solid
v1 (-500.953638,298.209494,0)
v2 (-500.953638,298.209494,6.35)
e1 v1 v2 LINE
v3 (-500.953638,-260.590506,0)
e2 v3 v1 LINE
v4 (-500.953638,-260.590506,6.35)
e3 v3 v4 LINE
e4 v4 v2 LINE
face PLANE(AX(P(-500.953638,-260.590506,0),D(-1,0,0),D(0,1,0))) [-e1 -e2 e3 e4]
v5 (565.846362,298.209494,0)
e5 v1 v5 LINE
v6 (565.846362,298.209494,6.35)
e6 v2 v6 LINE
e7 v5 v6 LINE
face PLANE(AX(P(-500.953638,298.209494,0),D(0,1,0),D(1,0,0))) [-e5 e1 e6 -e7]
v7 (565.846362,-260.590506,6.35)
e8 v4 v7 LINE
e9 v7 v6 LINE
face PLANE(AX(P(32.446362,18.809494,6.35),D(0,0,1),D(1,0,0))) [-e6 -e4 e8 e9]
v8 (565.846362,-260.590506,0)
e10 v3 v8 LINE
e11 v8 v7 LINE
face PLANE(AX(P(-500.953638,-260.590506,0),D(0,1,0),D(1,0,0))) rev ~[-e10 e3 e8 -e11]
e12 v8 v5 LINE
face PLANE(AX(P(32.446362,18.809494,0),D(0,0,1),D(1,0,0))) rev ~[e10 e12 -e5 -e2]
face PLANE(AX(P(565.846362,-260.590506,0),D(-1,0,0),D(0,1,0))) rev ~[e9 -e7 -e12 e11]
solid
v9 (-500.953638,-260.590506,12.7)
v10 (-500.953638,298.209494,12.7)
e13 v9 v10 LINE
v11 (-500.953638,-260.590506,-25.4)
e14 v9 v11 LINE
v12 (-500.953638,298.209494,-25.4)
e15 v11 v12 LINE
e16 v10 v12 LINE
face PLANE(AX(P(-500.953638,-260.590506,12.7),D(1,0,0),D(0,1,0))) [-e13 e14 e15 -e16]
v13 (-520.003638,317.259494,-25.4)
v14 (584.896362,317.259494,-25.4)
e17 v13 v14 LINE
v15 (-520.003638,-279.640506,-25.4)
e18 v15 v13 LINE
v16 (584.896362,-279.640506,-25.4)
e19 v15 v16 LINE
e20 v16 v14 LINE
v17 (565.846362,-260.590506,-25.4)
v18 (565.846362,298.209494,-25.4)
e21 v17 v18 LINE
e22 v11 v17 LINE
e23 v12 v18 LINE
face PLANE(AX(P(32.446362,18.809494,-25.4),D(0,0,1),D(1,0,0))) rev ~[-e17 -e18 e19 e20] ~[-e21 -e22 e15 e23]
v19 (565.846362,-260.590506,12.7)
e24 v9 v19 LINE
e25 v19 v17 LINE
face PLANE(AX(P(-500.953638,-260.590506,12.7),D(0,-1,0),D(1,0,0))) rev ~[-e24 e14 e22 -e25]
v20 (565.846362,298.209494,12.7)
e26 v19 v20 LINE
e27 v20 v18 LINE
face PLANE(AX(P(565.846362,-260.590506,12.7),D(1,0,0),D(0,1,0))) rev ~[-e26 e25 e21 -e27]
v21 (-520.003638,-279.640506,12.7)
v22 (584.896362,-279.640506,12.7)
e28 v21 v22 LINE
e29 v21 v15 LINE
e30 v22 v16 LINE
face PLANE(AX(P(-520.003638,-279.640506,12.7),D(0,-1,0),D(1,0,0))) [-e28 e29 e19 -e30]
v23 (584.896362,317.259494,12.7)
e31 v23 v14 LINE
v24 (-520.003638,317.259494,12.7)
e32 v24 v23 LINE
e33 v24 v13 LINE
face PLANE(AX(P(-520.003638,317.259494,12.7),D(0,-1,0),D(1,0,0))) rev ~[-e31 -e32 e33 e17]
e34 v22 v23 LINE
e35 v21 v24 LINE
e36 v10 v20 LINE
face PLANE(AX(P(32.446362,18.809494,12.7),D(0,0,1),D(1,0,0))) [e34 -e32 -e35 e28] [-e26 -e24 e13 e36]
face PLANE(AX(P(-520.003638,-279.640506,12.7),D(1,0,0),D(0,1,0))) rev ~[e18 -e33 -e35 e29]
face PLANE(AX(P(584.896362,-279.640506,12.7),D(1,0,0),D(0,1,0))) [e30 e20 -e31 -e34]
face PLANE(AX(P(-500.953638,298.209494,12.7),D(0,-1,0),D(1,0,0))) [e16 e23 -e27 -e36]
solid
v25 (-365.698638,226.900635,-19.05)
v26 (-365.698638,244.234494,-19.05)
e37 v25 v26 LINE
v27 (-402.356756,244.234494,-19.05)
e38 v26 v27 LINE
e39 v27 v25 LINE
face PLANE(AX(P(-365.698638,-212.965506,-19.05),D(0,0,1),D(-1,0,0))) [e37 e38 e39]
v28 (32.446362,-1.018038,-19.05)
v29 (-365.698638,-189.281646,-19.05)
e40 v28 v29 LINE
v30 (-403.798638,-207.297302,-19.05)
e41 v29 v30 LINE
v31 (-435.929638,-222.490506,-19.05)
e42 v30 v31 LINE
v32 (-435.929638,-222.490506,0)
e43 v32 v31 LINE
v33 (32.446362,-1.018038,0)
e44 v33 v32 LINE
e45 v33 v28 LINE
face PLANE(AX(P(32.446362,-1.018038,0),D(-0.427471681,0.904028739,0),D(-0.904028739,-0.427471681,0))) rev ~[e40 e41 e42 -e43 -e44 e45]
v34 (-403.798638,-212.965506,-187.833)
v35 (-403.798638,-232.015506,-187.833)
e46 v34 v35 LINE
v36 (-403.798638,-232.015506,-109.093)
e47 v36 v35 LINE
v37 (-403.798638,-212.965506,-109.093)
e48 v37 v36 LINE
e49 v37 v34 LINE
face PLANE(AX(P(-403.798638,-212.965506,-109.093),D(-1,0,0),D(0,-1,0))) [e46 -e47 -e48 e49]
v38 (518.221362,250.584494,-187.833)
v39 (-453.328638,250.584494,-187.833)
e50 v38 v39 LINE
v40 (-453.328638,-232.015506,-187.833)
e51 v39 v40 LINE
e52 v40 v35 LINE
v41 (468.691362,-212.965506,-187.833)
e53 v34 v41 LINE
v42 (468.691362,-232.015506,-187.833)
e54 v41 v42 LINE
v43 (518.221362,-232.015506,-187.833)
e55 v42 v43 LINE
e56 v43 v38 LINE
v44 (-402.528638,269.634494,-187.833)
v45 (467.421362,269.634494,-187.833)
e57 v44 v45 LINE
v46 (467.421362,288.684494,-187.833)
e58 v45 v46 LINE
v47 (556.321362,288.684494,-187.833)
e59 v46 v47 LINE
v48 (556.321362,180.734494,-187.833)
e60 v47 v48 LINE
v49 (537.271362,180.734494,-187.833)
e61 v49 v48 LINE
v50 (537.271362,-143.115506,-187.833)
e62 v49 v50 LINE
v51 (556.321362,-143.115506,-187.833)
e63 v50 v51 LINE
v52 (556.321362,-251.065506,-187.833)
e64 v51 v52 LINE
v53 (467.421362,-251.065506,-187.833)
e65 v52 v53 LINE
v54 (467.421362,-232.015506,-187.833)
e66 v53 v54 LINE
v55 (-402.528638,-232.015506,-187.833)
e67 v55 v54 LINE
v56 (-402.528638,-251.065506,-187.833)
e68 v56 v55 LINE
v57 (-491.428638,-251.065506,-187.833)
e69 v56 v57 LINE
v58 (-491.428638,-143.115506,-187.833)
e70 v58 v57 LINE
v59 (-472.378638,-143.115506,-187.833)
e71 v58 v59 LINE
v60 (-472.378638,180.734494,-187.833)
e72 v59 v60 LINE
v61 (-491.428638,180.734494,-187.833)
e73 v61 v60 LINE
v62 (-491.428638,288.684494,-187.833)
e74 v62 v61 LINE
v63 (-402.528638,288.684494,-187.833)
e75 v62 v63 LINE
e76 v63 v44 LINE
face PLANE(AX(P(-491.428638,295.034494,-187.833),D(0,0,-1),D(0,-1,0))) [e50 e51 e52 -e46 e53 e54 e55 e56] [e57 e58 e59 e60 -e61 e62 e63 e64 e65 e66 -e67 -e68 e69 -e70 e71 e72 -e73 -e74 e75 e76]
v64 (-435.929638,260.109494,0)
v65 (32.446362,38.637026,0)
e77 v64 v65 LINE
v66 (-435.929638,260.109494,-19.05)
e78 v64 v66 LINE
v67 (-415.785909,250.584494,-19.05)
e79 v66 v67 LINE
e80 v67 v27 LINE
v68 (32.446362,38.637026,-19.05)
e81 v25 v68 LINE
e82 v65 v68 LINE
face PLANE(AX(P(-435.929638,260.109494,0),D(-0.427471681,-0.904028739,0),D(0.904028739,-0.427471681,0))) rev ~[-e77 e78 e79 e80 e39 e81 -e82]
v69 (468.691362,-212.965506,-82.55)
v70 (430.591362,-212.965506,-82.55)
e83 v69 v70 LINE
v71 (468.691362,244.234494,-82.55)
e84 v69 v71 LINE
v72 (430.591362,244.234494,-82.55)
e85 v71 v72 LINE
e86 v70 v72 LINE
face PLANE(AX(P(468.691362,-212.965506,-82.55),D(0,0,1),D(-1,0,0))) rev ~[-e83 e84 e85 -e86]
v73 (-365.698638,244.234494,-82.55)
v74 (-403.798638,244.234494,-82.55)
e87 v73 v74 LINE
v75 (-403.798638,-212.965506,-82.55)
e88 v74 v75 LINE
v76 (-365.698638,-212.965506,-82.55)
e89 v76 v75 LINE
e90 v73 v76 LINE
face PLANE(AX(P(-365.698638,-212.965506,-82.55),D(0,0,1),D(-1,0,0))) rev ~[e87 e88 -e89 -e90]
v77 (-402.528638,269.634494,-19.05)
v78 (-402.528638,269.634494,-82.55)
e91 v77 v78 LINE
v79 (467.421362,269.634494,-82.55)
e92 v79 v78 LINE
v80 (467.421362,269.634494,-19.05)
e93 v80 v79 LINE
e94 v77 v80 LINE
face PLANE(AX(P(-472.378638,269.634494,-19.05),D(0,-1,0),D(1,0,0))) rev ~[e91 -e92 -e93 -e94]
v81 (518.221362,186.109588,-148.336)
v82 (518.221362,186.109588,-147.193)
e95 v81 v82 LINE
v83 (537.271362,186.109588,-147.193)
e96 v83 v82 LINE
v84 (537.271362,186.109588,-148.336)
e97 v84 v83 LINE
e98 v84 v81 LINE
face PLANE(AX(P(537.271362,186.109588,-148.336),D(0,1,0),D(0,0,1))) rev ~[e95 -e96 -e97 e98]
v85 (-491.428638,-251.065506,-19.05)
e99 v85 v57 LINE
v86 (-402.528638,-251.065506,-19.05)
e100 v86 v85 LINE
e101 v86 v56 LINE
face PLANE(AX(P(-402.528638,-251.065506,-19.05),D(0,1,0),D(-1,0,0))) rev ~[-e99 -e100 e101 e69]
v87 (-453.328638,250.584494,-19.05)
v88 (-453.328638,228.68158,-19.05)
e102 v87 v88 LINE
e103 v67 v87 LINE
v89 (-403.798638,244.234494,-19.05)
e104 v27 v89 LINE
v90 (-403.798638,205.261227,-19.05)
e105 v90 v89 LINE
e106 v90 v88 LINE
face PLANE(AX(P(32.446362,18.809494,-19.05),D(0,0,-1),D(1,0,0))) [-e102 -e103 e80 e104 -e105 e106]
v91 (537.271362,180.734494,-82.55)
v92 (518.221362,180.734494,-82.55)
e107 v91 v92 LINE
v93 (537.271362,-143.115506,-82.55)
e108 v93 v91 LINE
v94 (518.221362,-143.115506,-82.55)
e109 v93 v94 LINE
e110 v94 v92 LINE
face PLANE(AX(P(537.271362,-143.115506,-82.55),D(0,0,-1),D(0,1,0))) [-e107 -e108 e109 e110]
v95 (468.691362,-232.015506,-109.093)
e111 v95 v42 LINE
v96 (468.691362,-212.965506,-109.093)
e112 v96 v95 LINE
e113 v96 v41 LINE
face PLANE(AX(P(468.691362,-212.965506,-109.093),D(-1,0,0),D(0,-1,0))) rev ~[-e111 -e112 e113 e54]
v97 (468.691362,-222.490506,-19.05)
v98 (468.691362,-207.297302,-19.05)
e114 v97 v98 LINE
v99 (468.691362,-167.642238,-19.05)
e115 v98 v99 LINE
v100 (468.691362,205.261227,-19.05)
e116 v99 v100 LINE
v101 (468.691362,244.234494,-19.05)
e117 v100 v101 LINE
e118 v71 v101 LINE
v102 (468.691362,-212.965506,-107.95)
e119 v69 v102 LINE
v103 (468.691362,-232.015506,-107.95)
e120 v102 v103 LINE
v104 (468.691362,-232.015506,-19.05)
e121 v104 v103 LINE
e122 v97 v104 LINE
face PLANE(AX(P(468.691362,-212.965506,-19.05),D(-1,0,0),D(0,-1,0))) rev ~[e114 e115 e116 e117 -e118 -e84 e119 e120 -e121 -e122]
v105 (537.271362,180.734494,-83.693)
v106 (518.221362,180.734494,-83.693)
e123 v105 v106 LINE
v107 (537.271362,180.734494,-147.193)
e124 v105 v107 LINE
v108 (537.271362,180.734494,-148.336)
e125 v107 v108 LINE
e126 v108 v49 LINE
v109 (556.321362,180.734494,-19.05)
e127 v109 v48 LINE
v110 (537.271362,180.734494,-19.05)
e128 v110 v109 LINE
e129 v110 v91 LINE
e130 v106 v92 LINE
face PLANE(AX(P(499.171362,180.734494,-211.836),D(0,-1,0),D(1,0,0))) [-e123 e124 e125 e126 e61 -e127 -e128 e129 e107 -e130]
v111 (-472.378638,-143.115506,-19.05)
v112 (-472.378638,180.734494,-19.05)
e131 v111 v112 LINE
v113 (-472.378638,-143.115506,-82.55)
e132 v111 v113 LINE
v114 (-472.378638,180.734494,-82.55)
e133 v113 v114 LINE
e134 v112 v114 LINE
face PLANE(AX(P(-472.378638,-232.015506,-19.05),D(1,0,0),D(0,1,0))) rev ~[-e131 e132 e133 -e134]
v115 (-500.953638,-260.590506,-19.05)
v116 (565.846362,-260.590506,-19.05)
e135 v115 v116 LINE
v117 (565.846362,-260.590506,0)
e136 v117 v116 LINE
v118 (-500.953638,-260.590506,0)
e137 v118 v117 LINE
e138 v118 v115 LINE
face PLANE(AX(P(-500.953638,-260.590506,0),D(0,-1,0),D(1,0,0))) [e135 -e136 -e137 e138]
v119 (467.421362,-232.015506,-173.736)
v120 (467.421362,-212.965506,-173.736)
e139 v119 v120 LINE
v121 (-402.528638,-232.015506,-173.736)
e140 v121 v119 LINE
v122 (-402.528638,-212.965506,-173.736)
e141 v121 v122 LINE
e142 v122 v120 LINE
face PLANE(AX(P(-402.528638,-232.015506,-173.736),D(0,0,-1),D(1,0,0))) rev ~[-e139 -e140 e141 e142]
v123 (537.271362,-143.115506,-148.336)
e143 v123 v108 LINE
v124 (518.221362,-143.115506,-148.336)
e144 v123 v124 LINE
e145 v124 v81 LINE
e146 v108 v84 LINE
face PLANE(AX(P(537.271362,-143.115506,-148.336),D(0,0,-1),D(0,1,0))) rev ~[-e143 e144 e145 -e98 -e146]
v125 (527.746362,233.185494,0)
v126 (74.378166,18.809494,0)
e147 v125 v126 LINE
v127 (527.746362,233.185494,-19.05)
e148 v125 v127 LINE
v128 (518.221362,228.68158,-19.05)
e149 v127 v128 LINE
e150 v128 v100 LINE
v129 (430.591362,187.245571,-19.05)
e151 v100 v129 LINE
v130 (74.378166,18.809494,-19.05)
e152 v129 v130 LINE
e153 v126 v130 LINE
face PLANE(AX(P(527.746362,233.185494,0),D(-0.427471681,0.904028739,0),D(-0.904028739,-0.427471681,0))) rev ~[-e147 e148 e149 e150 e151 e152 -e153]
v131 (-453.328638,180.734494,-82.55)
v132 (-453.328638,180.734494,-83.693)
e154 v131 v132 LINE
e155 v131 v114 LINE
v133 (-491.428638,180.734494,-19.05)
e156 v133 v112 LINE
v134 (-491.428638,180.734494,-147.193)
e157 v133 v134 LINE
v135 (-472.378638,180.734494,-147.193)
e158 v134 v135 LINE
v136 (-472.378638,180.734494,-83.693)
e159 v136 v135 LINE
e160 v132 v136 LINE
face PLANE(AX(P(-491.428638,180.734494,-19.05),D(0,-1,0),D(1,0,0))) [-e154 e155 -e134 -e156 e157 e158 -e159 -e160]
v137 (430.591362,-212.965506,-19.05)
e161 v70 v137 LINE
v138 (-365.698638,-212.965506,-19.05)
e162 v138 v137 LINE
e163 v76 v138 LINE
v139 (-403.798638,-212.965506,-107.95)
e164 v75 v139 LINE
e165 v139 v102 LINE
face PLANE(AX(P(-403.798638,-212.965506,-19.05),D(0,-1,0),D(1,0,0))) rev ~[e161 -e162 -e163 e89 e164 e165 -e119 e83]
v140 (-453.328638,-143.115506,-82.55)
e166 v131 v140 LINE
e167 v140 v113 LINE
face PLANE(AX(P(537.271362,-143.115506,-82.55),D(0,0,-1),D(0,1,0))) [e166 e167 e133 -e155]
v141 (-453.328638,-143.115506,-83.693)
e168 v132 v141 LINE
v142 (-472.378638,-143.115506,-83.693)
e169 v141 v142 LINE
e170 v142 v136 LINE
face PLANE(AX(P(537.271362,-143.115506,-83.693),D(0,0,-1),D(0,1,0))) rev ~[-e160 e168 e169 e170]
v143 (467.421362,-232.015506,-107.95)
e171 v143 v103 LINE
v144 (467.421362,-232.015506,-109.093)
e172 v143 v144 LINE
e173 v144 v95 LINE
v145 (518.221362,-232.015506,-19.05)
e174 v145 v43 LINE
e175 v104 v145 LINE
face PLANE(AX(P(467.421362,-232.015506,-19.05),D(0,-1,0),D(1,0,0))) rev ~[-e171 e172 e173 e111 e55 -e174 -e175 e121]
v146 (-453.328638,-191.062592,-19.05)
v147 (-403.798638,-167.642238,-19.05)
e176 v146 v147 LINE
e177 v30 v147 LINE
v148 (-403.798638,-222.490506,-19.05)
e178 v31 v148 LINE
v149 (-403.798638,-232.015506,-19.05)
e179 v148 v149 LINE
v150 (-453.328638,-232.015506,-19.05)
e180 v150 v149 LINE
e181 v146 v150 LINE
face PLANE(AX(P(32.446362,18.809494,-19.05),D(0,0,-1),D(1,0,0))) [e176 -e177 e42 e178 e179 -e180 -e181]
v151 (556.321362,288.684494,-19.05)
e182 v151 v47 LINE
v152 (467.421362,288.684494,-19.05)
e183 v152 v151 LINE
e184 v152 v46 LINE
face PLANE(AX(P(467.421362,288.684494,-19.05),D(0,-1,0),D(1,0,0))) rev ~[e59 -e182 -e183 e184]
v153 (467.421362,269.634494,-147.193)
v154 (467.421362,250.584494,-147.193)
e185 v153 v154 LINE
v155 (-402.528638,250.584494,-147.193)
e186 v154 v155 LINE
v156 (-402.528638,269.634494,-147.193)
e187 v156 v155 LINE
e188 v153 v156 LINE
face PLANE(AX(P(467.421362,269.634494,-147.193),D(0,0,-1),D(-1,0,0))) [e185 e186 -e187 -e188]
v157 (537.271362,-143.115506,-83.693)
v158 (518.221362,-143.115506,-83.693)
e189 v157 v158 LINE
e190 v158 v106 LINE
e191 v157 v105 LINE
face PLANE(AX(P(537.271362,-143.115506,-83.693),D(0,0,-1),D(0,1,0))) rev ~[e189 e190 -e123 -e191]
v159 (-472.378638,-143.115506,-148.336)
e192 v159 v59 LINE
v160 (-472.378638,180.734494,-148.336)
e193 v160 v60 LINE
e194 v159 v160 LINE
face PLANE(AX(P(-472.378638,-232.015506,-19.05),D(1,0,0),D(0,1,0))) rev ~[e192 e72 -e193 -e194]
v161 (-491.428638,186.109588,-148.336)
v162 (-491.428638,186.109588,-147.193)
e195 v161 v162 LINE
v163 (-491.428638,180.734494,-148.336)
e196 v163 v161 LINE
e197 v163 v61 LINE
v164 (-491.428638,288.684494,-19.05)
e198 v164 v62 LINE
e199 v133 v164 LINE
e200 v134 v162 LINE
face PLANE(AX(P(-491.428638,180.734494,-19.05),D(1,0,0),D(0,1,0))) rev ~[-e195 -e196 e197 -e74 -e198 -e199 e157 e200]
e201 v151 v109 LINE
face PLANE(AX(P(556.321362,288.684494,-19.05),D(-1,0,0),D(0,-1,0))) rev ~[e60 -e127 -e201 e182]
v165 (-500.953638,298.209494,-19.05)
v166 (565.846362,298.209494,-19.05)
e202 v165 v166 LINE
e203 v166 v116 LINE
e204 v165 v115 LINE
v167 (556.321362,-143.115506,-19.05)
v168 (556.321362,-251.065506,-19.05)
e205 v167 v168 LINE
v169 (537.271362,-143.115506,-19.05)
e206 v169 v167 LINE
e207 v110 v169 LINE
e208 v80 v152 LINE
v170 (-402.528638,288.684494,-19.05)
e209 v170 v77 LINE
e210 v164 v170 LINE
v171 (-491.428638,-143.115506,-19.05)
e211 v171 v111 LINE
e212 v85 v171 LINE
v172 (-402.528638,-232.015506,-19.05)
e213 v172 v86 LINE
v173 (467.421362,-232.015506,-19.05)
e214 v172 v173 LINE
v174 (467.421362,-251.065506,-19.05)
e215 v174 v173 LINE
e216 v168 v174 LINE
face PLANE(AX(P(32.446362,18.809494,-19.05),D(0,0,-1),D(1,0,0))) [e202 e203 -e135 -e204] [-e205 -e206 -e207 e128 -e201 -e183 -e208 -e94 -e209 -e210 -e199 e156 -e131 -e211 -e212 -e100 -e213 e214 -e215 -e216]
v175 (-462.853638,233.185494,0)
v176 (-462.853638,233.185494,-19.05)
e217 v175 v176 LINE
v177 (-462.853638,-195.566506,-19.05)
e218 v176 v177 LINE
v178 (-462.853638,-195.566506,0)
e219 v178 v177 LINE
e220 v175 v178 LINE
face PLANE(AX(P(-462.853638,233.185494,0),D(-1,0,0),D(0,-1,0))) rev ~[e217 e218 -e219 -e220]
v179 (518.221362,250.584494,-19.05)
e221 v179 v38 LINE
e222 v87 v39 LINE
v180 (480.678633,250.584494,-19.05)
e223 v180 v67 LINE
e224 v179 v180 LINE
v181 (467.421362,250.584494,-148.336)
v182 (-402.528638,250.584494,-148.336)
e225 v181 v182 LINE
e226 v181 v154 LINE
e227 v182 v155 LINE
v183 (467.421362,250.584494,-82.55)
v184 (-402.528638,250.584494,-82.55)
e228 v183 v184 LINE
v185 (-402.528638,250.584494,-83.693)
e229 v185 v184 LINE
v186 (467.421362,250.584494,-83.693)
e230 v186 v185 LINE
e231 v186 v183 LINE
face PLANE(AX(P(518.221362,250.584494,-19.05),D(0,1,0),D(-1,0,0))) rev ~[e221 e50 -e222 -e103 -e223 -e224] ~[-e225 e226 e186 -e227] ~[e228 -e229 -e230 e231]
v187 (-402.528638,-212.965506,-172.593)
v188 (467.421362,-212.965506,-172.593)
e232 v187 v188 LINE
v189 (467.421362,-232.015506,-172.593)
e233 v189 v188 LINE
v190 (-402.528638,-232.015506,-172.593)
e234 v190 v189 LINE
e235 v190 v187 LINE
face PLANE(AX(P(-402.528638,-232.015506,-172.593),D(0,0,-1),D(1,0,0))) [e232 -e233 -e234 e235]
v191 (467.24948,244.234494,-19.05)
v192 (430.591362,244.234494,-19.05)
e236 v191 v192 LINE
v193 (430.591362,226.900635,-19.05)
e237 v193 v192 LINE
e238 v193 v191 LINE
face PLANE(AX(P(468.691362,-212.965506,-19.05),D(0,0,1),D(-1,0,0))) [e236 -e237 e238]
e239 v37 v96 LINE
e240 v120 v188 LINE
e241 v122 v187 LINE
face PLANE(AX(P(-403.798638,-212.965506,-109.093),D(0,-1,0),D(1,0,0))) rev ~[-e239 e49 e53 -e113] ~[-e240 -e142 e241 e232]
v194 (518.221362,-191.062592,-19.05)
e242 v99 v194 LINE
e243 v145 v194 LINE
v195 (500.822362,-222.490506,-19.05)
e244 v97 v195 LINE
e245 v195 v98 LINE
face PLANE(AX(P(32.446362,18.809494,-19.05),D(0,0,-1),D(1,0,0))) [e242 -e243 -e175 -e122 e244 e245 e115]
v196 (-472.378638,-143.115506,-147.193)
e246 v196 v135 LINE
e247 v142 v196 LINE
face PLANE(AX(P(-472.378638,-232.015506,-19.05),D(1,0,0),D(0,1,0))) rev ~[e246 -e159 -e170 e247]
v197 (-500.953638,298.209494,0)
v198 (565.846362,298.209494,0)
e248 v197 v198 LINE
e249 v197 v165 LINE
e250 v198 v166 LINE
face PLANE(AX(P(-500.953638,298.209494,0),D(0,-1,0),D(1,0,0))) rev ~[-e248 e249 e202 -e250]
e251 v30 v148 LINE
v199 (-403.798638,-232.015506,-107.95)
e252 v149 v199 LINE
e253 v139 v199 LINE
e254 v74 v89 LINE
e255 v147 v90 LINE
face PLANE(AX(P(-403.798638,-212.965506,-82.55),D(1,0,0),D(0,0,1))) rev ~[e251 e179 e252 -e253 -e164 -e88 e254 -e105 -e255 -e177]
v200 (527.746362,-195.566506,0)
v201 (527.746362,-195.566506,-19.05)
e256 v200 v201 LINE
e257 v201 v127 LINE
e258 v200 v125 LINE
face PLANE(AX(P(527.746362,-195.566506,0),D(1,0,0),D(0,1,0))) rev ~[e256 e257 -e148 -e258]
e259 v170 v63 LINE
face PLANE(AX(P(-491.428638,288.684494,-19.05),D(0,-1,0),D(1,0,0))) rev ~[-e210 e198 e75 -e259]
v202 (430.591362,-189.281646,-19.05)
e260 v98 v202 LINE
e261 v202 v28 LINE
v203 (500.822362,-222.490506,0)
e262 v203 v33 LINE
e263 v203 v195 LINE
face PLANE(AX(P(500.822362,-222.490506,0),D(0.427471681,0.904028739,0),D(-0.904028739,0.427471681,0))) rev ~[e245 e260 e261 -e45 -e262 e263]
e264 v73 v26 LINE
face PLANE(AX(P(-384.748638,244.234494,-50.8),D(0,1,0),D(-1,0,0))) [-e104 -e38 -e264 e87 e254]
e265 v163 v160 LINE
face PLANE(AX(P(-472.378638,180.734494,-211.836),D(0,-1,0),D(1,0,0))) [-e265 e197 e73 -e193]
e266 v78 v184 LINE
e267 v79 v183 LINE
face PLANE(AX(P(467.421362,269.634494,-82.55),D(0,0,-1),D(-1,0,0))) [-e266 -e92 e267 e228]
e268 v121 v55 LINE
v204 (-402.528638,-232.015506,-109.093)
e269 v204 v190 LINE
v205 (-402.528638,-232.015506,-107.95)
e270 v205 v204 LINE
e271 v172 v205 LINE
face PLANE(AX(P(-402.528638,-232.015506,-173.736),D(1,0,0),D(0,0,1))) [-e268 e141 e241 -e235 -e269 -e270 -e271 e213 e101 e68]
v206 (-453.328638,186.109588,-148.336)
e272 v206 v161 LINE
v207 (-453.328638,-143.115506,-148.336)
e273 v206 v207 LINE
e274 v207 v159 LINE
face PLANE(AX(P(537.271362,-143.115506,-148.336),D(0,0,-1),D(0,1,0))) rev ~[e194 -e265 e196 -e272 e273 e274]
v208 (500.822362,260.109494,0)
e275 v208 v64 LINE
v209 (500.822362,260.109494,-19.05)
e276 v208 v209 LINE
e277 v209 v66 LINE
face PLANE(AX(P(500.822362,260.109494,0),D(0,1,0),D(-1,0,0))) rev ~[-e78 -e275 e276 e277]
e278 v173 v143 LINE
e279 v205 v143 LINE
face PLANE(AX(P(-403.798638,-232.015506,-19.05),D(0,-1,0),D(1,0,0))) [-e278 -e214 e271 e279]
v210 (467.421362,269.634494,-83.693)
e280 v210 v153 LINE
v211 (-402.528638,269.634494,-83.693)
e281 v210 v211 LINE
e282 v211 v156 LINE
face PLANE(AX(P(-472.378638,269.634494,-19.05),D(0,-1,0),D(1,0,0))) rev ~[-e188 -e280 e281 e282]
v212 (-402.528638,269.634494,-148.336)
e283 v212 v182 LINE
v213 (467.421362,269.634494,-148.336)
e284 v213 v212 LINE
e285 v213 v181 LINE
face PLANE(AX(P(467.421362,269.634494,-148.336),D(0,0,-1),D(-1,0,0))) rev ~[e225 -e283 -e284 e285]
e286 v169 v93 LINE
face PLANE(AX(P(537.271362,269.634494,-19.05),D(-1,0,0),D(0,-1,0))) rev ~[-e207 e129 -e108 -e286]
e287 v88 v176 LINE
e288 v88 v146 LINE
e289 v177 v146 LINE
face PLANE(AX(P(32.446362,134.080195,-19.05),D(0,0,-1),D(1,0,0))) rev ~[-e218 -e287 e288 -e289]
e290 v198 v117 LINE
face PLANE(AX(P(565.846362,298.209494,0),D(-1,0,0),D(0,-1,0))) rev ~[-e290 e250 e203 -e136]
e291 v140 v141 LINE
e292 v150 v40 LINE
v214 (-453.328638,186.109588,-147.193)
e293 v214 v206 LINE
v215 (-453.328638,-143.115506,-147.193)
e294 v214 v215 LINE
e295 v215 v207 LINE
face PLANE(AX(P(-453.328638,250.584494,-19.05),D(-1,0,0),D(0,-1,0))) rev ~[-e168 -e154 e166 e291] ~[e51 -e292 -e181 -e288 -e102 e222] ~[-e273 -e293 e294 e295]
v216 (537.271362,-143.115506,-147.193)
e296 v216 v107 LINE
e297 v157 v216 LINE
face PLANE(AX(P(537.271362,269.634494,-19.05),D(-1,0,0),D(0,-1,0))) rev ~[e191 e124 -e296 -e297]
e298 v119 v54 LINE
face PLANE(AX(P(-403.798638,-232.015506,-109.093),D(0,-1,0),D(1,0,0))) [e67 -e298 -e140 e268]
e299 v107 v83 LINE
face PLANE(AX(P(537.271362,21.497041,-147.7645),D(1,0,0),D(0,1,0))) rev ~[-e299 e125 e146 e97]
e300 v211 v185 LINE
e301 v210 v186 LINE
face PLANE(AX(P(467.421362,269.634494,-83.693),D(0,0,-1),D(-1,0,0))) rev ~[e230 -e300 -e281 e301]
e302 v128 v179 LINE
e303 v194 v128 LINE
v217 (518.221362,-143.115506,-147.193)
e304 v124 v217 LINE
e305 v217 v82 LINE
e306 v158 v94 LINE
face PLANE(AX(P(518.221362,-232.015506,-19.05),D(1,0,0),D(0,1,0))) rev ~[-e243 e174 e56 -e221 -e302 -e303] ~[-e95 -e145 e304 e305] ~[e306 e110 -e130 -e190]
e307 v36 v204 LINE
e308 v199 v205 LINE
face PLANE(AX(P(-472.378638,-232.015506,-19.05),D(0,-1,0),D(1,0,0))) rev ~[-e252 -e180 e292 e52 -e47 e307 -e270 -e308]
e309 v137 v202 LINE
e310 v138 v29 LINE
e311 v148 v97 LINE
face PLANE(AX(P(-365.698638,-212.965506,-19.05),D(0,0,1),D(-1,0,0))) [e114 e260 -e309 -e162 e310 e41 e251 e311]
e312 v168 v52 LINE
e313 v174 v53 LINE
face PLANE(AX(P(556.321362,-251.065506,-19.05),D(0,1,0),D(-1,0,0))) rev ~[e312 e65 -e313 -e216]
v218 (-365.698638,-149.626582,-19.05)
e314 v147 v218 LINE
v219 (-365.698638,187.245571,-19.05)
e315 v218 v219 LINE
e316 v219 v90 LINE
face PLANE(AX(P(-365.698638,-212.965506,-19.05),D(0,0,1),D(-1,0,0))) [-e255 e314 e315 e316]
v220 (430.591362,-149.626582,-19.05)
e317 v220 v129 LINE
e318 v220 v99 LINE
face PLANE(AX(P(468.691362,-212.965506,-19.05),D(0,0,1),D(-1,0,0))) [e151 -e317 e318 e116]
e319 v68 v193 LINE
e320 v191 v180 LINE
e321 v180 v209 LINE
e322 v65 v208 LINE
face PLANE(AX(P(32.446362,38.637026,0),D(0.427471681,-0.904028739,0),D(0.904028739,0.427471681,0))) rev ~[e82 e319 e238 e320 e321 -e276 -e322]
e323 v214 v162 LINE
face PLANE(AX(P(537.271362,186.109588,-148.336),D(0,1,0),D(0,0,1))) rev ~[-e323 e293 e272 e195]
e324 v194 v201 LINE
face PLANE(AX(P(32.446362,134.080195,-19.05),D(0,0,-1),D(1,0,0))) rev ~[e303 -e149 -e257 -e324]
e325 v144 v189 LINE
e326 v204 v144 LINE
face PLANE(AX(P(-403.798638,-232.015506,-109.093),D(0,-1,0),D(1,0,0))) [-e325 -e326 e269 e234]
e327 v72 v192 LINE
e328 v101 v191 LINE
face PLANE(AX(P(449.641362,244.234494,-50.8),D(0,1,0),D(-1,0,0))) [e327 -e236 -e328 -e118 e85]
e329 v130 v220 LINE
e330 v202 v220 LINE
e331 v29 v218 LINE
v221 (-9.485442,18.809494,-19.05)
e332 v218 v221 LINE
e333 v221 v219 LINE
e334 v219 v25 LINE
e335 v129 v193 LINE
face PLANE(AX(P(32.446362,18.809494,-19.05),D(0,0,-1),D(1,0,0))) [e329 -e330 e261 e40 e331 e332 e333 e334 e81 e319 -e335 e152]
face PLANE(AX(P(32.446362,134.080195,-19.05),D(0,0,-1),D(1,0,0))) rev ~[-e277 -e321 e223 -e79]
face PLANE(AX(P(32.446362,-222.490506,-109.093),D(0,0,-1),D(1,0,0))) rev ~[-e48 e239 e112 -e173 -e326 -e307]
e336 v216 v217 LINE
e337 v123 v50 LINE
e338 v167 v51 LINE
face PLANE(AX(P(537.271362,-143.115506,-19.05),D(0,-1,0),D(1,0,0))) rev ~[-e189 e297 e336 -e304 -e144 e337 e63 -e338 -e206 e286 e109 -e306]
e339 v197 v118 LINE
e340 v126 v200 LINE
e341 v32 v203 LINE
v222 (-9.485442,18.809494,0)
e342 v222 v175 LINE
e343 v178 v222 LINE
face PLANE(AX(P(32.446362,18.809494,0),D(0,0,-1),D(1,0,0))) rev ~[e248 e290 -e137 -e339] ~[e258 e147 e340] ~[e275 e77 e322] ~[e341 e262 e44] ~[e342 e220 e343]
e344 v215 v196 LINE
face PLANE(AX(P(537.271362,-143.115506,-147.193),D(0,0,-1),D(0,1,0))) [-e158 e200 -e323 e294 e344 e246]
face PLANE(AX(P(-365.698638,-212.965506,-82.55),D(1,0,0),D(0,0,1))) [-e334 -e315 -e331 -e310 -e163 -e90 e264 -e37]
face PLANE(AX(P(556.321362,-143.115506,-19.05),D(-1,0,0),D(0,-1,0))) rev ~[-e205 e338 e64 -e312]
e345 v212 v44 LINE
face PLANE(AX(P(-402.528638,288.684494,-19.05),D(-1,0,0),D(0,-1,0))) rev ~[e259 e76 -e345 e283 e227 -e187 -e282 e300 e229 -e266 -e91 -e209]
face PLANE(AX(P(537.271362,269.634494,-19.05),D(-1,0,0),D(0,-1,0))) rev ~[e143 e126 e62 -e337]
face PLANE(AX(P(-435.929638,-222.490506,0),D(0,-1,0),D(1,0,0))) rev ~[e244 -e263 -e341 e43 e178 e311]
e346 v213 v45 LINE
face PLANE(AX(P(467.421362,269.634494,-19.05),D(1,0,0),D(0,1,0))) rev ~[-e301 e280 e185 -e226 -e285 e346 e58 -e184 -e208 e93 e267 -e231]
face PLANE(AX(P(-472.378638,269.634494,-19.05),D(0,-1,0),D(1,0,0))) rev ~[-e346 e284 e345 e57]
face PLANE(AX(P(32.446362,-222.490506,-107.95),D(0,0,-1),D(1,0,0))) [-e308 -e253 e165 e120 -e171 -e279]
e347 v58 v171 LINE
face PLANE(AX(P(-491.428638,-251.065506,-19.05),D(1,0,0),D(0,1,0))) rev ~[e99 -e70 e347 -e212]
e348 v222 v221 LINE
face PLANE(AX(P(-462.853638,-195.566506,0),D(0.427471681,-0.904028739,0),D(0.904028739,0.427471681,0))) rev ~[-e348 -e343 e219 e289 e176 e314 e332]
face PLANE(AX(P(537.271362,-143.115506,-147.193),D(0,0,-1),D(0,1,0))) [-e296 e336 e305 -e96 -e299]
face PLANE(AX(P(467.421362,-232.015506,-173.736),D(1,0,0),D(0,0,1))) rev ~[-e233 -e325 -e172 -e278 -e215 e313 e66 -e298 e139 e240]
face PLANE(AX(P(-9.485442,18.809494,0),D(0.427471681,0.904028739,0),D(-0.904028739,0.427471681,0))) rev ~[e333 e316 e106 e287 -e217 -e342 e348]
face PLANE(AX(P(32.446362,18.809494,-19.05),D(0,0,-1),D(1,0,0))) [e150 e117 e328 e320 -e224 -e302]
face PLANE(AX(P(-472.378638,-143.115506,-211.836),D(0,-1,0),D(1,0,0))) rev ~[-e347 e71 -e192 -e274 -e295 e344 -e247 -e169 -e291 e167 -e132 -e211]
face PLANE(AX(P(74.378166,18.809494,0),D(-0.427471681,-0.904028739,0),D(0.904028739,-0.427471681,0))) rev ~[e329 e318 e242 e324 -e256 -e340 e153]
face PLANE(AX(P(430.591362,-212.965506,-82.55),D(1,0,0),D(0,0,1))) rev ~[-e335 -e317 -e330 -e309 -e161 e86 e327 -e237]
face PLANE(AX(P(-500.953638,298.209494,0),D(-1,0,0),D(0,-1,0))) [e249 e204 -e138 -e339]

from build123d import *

# Parameters (mm, degrees)
F0_W      = 1066.8
F0_H      = 558.8
F1_DEPTH  = 6.35
F3_W      = 1104.9
F3_H      = 596.9
F3_W_2    = 1066.8
F3_H_2    = 558.8
F4_DEPTH  = 38.1
F5_W      = 1066.8
F5_H      = 558.8
F6_DEPTH  = 19.05
F7_W      = 872.49
F7_H      = 19.05
F8_DEPTH  = 88.9
F9_W      = 38.1
F9_H      = 63.5
F10_DEPTH = 457.2
F11_W     = 19.05
F11_H     = 88.9
F12_DEPTH = 419.1
F14_DEPTH = 192.786
F15_W     = 323.85
F15_H     = 1.143
F15_W_2   = 329.2250932205
F16_DEPTH = 1219.2
F17_W     = 869.95
F17_H     = 1.143
F18_DEPTH = 25.4
F20_W     = 872.49
F20_H     = 19.05
F21_DEPTH = 128.143
F22_W     = 869.95
F22_H     = 1.143
F23_DEPTH = 25.4
F24_W     = 38.1
F24_H     = 88.9
F25_DEPTH = 226.314
F26_W     = 558.8
F26_H     = 381
F27_DEPTH = 1397


# Not quite as in the source:
# - a feature of the source that left no trace in its solid (it failed there, or was rolled back) is left out


with BuildPart() as f1:
    # F0 (on Top) → F1 (new body)
    with BuildSketch(Plane.XY):
        with Locations((32.4463618145, 18.8094943296)):
            Rectangle(F0_W, F0_H)
    extrude(amount=F1_DEPTH)


with BuildPart() as f4:
    # F3 (on offset) → F4 (new body)
    with BuildSketch(Plane.XY.offset(12.7)):
        with Locations((32.4463618145, 18.8094943296)):
            Rectangle(F3_W, F3_H)
        with Locations((32.4463618145, 18.8094943296)):
            Rectangle(F3_W_2, F3_H_2, mode=Mode.SUBTRACT)
    extrude(amount=-F4_DEPTH)


with BuildPart() as f6:
    # F5 (on face) → F6 (new body)
    with BuildSketch(Plane(origin=(0, 0, 0), x_dir=(1, 0, 0), z_dir=(0, 0, -1))):
        with Locations((32.4463618145, -18.8094943296)):
            Rectangle(F5_W, F5_H)
        Polygon((-462.8536381855, -233.1854943296), (-462.8536381855, 195.5665056704), (-9.4854419759, -18.8094943296), align=None, mode=Mode.SUBTRACT)
        Polygon((32.4463618145, -38.6370262221), (500.8223618145, -260.1094943296), (-435.9296381855, -260.1094943296), align=None, mode=Mode.SUBTRACT)
        Polygon((-435.9296381855, 222.4905056704), (500.8223618145, 222.4905056704), (32.4463618145, 1.0180375628), align=None, mode=Mode.SUBTRACT)
        Polygon((74.378165605, -18.8094943296), (527.7463618145, 195.5665056704), (527.7463618145, -233.1854943296), align=None, mode=Mode.SUBTRACT)
    extrude(amount=F6_DEPTH)

    # F7 (on face) → F8 (join)
    with BuildSketch(Plane(origin=(0, 0, -19.05), x_dir=(1, 0, 0), z_dir=(0, 0, -1))):
        with Locations((32.4463618145, 222.4905056704)):
            Rectangle(F7_W, F7_H)
    extrude(amount=F8_DEPTH)

    # F9 (on face) → F10 (join)
    with BuildSketch(Plane(origin=(0, -212.9655056704, 0), x_dir=(-1, 0, 0), z_dir=(0, 1, 0))):
        with Locations((384.7486381855, -50.8)):
            Rectangle(F9_W, F9_H)
        with Locations((-449.6413618145, -50.8)):
            Rectangle(F9_W, F9_H)
    extrude(amount=F10_DEPTH)

    # F11 (on face) → F12 (join)
    with BuildSketch(Plane(origin=(0, 0, -19.05), x_dir=(1, 0, 0), z_dir=(0, 0, -1))):
        Polygon((-402.5286381855, 251.0655056704), (-491.4286381855, 251.0655056704), (-491.4286381855, 232.0155056704), (-472.3786381855, 232.0155056704), (-402.5286381855, 232.0155056704), align=None)
        with Locations((-481.9036381855, 187.5655056704)):
            Rectangle(F11_W, F11_H)
        Polygon((-491.4286381855, -269.6344943296), (-491.4286381855, -288.6844943296), (-402.5286381855, -288.6844943296), (-402.5286381855, -269.6344943296), (-472.3786381855, -269.6344943296), align=None)
        with Locations((-481.9036381855, -225.1844943296)):
            Rectangle(F11_W, F11_H)
        Polygon((467.4213618145, -288.6844943296), (556.3213618145, -288.6844943296), (556.3213618145, -269.6344943296), (537.2713618145, -269.6344943296), (467.4213618145, -269.6344943296), align=None)
        with Locations((546.7963618145, -225.1844943296)):
            Rectangle(F11_W, F11_H)
        with Locations((546.7963618145, 187.5655056704)):
            Rectangle(F11_W, F11_H)
        Polygon((537.2713618145, 232.0155056704), (556.3213618145, 232.0155056704), (556.3213618145, 251.0655056704), (467.4213618145, 251.0655056704), (467.4213618145, 232.0155056704), align=None)
    extrude(amount=F12_DEPTH)

    # F13 (on face) → F14 (join)
    with BuildSketch(Plane(origin=(0, 0, -19.05), x_dir=(1, 0, 0), z_dir=(0, 0, -1))):
        Polygon((-453.3286381855, 232.0155056704), (-472.3786381855, 232.0155056704), (-472.3786381855, -269.6344943296), (537.2713618145, -269.6344943296), (537.2713618145, 232.0155056704), (518.2213618145, 232.0155056704), (518.2213618145, 212.9655056704), (518.2213618145, -250.5844943296), (-453.3286381855, -250.5844943296), (-453.3286381855, 212.9655056704), align=None)
    extrude(amount=F14_DEPTH)

    # F15 (on face) → F16 (cut)
    with BuildSketch(Plane.YZ.offset(537.2713618145)):
        with Locations((18.8094943296, -83.1215)):
            Rectangle(F15_W, F15_H)
        with Locations((21.4970409399, -147.7645)):
            Rectangle(F15_W_2, F15_H)
    extrude(amount=-F16_DEPTH, mode=Mode.SUBTRACT)

    # F17 (on face) → F18 (cut)
    with BuildSketch(Plane(origin=(0, 269.6344943296, 0), x_dir=(-1, 0, 0), z_dir=(0, 1, 0))):
        with Locations((-32.4463618145, -147.7645)):
            Rectangle(F17_W, F17_H)
        with Locations((-32.4463618145, -83.1215)):
            Rectangle(F17_W, F17_H)
    extrude(amount=-F18_DEPTH, mode=Mode.SUBTRACT)

    # F20 (on offset) → F21 (join)
    with BuildSketch(Plane(origin=(0, 0, -109.093), x_dir=(1, 0, 0), z_dir=(0, 0, -1))):
        with Locations((32.4463618145, 222.4905056704)):
            Rectangle(F20_W, F20_H)
    extrude(amount=F21_DEPTH)

    # F22 (on face) → F23 (cut)
    with BuildSketch(Plane.XZ.offset(232.0155056704)):
        with Locations((32.4463618145, -173.1645)):
            Rectangle(F22_W, F22_H)
    extrude(amount=-F23_DEPTH, mode=Mode.SUBTRACT)

    # F24 (on face) → F25 (join, through all)
    with BuildSketch(Plane(origin=(0, 0, -211.836), x_dir=(1, 0, 0), z_dir=(0, 0, -1))):
        with Locations((-453.3286381855, -225.1844943296)):
            Rectangle(F24_W, F24_H)
        with Locations((-453.3286381855, 187.5655056704)):
            Rectangle(F24_W, F24_H)
        with Locations((518.2213618145, -225.1844943296)):
            Rectangle(F24_W, F24_H)
        with Locations((518.2213618145, 187.5655056704)):
            Rectangle(F24_W, F24_H)
    extrude(amount=F25_DEPTH)

    # F26 (on face) → F27 (cut)
    with BuildSketch(Plane(origin=(-491.4286381855, 0, 0), x_dir=(0, -1, 0), z_dir=(-1, 0, 0))):
        with Locations((-15.6344943296, -378.333)):
            Rectangle(F26_W, F26_H)
    extrude(amount=-F27_DEPTH, mode=Mode.SUBTRACT)


solid = Compound([f1.part, f4.part, f6.part])
